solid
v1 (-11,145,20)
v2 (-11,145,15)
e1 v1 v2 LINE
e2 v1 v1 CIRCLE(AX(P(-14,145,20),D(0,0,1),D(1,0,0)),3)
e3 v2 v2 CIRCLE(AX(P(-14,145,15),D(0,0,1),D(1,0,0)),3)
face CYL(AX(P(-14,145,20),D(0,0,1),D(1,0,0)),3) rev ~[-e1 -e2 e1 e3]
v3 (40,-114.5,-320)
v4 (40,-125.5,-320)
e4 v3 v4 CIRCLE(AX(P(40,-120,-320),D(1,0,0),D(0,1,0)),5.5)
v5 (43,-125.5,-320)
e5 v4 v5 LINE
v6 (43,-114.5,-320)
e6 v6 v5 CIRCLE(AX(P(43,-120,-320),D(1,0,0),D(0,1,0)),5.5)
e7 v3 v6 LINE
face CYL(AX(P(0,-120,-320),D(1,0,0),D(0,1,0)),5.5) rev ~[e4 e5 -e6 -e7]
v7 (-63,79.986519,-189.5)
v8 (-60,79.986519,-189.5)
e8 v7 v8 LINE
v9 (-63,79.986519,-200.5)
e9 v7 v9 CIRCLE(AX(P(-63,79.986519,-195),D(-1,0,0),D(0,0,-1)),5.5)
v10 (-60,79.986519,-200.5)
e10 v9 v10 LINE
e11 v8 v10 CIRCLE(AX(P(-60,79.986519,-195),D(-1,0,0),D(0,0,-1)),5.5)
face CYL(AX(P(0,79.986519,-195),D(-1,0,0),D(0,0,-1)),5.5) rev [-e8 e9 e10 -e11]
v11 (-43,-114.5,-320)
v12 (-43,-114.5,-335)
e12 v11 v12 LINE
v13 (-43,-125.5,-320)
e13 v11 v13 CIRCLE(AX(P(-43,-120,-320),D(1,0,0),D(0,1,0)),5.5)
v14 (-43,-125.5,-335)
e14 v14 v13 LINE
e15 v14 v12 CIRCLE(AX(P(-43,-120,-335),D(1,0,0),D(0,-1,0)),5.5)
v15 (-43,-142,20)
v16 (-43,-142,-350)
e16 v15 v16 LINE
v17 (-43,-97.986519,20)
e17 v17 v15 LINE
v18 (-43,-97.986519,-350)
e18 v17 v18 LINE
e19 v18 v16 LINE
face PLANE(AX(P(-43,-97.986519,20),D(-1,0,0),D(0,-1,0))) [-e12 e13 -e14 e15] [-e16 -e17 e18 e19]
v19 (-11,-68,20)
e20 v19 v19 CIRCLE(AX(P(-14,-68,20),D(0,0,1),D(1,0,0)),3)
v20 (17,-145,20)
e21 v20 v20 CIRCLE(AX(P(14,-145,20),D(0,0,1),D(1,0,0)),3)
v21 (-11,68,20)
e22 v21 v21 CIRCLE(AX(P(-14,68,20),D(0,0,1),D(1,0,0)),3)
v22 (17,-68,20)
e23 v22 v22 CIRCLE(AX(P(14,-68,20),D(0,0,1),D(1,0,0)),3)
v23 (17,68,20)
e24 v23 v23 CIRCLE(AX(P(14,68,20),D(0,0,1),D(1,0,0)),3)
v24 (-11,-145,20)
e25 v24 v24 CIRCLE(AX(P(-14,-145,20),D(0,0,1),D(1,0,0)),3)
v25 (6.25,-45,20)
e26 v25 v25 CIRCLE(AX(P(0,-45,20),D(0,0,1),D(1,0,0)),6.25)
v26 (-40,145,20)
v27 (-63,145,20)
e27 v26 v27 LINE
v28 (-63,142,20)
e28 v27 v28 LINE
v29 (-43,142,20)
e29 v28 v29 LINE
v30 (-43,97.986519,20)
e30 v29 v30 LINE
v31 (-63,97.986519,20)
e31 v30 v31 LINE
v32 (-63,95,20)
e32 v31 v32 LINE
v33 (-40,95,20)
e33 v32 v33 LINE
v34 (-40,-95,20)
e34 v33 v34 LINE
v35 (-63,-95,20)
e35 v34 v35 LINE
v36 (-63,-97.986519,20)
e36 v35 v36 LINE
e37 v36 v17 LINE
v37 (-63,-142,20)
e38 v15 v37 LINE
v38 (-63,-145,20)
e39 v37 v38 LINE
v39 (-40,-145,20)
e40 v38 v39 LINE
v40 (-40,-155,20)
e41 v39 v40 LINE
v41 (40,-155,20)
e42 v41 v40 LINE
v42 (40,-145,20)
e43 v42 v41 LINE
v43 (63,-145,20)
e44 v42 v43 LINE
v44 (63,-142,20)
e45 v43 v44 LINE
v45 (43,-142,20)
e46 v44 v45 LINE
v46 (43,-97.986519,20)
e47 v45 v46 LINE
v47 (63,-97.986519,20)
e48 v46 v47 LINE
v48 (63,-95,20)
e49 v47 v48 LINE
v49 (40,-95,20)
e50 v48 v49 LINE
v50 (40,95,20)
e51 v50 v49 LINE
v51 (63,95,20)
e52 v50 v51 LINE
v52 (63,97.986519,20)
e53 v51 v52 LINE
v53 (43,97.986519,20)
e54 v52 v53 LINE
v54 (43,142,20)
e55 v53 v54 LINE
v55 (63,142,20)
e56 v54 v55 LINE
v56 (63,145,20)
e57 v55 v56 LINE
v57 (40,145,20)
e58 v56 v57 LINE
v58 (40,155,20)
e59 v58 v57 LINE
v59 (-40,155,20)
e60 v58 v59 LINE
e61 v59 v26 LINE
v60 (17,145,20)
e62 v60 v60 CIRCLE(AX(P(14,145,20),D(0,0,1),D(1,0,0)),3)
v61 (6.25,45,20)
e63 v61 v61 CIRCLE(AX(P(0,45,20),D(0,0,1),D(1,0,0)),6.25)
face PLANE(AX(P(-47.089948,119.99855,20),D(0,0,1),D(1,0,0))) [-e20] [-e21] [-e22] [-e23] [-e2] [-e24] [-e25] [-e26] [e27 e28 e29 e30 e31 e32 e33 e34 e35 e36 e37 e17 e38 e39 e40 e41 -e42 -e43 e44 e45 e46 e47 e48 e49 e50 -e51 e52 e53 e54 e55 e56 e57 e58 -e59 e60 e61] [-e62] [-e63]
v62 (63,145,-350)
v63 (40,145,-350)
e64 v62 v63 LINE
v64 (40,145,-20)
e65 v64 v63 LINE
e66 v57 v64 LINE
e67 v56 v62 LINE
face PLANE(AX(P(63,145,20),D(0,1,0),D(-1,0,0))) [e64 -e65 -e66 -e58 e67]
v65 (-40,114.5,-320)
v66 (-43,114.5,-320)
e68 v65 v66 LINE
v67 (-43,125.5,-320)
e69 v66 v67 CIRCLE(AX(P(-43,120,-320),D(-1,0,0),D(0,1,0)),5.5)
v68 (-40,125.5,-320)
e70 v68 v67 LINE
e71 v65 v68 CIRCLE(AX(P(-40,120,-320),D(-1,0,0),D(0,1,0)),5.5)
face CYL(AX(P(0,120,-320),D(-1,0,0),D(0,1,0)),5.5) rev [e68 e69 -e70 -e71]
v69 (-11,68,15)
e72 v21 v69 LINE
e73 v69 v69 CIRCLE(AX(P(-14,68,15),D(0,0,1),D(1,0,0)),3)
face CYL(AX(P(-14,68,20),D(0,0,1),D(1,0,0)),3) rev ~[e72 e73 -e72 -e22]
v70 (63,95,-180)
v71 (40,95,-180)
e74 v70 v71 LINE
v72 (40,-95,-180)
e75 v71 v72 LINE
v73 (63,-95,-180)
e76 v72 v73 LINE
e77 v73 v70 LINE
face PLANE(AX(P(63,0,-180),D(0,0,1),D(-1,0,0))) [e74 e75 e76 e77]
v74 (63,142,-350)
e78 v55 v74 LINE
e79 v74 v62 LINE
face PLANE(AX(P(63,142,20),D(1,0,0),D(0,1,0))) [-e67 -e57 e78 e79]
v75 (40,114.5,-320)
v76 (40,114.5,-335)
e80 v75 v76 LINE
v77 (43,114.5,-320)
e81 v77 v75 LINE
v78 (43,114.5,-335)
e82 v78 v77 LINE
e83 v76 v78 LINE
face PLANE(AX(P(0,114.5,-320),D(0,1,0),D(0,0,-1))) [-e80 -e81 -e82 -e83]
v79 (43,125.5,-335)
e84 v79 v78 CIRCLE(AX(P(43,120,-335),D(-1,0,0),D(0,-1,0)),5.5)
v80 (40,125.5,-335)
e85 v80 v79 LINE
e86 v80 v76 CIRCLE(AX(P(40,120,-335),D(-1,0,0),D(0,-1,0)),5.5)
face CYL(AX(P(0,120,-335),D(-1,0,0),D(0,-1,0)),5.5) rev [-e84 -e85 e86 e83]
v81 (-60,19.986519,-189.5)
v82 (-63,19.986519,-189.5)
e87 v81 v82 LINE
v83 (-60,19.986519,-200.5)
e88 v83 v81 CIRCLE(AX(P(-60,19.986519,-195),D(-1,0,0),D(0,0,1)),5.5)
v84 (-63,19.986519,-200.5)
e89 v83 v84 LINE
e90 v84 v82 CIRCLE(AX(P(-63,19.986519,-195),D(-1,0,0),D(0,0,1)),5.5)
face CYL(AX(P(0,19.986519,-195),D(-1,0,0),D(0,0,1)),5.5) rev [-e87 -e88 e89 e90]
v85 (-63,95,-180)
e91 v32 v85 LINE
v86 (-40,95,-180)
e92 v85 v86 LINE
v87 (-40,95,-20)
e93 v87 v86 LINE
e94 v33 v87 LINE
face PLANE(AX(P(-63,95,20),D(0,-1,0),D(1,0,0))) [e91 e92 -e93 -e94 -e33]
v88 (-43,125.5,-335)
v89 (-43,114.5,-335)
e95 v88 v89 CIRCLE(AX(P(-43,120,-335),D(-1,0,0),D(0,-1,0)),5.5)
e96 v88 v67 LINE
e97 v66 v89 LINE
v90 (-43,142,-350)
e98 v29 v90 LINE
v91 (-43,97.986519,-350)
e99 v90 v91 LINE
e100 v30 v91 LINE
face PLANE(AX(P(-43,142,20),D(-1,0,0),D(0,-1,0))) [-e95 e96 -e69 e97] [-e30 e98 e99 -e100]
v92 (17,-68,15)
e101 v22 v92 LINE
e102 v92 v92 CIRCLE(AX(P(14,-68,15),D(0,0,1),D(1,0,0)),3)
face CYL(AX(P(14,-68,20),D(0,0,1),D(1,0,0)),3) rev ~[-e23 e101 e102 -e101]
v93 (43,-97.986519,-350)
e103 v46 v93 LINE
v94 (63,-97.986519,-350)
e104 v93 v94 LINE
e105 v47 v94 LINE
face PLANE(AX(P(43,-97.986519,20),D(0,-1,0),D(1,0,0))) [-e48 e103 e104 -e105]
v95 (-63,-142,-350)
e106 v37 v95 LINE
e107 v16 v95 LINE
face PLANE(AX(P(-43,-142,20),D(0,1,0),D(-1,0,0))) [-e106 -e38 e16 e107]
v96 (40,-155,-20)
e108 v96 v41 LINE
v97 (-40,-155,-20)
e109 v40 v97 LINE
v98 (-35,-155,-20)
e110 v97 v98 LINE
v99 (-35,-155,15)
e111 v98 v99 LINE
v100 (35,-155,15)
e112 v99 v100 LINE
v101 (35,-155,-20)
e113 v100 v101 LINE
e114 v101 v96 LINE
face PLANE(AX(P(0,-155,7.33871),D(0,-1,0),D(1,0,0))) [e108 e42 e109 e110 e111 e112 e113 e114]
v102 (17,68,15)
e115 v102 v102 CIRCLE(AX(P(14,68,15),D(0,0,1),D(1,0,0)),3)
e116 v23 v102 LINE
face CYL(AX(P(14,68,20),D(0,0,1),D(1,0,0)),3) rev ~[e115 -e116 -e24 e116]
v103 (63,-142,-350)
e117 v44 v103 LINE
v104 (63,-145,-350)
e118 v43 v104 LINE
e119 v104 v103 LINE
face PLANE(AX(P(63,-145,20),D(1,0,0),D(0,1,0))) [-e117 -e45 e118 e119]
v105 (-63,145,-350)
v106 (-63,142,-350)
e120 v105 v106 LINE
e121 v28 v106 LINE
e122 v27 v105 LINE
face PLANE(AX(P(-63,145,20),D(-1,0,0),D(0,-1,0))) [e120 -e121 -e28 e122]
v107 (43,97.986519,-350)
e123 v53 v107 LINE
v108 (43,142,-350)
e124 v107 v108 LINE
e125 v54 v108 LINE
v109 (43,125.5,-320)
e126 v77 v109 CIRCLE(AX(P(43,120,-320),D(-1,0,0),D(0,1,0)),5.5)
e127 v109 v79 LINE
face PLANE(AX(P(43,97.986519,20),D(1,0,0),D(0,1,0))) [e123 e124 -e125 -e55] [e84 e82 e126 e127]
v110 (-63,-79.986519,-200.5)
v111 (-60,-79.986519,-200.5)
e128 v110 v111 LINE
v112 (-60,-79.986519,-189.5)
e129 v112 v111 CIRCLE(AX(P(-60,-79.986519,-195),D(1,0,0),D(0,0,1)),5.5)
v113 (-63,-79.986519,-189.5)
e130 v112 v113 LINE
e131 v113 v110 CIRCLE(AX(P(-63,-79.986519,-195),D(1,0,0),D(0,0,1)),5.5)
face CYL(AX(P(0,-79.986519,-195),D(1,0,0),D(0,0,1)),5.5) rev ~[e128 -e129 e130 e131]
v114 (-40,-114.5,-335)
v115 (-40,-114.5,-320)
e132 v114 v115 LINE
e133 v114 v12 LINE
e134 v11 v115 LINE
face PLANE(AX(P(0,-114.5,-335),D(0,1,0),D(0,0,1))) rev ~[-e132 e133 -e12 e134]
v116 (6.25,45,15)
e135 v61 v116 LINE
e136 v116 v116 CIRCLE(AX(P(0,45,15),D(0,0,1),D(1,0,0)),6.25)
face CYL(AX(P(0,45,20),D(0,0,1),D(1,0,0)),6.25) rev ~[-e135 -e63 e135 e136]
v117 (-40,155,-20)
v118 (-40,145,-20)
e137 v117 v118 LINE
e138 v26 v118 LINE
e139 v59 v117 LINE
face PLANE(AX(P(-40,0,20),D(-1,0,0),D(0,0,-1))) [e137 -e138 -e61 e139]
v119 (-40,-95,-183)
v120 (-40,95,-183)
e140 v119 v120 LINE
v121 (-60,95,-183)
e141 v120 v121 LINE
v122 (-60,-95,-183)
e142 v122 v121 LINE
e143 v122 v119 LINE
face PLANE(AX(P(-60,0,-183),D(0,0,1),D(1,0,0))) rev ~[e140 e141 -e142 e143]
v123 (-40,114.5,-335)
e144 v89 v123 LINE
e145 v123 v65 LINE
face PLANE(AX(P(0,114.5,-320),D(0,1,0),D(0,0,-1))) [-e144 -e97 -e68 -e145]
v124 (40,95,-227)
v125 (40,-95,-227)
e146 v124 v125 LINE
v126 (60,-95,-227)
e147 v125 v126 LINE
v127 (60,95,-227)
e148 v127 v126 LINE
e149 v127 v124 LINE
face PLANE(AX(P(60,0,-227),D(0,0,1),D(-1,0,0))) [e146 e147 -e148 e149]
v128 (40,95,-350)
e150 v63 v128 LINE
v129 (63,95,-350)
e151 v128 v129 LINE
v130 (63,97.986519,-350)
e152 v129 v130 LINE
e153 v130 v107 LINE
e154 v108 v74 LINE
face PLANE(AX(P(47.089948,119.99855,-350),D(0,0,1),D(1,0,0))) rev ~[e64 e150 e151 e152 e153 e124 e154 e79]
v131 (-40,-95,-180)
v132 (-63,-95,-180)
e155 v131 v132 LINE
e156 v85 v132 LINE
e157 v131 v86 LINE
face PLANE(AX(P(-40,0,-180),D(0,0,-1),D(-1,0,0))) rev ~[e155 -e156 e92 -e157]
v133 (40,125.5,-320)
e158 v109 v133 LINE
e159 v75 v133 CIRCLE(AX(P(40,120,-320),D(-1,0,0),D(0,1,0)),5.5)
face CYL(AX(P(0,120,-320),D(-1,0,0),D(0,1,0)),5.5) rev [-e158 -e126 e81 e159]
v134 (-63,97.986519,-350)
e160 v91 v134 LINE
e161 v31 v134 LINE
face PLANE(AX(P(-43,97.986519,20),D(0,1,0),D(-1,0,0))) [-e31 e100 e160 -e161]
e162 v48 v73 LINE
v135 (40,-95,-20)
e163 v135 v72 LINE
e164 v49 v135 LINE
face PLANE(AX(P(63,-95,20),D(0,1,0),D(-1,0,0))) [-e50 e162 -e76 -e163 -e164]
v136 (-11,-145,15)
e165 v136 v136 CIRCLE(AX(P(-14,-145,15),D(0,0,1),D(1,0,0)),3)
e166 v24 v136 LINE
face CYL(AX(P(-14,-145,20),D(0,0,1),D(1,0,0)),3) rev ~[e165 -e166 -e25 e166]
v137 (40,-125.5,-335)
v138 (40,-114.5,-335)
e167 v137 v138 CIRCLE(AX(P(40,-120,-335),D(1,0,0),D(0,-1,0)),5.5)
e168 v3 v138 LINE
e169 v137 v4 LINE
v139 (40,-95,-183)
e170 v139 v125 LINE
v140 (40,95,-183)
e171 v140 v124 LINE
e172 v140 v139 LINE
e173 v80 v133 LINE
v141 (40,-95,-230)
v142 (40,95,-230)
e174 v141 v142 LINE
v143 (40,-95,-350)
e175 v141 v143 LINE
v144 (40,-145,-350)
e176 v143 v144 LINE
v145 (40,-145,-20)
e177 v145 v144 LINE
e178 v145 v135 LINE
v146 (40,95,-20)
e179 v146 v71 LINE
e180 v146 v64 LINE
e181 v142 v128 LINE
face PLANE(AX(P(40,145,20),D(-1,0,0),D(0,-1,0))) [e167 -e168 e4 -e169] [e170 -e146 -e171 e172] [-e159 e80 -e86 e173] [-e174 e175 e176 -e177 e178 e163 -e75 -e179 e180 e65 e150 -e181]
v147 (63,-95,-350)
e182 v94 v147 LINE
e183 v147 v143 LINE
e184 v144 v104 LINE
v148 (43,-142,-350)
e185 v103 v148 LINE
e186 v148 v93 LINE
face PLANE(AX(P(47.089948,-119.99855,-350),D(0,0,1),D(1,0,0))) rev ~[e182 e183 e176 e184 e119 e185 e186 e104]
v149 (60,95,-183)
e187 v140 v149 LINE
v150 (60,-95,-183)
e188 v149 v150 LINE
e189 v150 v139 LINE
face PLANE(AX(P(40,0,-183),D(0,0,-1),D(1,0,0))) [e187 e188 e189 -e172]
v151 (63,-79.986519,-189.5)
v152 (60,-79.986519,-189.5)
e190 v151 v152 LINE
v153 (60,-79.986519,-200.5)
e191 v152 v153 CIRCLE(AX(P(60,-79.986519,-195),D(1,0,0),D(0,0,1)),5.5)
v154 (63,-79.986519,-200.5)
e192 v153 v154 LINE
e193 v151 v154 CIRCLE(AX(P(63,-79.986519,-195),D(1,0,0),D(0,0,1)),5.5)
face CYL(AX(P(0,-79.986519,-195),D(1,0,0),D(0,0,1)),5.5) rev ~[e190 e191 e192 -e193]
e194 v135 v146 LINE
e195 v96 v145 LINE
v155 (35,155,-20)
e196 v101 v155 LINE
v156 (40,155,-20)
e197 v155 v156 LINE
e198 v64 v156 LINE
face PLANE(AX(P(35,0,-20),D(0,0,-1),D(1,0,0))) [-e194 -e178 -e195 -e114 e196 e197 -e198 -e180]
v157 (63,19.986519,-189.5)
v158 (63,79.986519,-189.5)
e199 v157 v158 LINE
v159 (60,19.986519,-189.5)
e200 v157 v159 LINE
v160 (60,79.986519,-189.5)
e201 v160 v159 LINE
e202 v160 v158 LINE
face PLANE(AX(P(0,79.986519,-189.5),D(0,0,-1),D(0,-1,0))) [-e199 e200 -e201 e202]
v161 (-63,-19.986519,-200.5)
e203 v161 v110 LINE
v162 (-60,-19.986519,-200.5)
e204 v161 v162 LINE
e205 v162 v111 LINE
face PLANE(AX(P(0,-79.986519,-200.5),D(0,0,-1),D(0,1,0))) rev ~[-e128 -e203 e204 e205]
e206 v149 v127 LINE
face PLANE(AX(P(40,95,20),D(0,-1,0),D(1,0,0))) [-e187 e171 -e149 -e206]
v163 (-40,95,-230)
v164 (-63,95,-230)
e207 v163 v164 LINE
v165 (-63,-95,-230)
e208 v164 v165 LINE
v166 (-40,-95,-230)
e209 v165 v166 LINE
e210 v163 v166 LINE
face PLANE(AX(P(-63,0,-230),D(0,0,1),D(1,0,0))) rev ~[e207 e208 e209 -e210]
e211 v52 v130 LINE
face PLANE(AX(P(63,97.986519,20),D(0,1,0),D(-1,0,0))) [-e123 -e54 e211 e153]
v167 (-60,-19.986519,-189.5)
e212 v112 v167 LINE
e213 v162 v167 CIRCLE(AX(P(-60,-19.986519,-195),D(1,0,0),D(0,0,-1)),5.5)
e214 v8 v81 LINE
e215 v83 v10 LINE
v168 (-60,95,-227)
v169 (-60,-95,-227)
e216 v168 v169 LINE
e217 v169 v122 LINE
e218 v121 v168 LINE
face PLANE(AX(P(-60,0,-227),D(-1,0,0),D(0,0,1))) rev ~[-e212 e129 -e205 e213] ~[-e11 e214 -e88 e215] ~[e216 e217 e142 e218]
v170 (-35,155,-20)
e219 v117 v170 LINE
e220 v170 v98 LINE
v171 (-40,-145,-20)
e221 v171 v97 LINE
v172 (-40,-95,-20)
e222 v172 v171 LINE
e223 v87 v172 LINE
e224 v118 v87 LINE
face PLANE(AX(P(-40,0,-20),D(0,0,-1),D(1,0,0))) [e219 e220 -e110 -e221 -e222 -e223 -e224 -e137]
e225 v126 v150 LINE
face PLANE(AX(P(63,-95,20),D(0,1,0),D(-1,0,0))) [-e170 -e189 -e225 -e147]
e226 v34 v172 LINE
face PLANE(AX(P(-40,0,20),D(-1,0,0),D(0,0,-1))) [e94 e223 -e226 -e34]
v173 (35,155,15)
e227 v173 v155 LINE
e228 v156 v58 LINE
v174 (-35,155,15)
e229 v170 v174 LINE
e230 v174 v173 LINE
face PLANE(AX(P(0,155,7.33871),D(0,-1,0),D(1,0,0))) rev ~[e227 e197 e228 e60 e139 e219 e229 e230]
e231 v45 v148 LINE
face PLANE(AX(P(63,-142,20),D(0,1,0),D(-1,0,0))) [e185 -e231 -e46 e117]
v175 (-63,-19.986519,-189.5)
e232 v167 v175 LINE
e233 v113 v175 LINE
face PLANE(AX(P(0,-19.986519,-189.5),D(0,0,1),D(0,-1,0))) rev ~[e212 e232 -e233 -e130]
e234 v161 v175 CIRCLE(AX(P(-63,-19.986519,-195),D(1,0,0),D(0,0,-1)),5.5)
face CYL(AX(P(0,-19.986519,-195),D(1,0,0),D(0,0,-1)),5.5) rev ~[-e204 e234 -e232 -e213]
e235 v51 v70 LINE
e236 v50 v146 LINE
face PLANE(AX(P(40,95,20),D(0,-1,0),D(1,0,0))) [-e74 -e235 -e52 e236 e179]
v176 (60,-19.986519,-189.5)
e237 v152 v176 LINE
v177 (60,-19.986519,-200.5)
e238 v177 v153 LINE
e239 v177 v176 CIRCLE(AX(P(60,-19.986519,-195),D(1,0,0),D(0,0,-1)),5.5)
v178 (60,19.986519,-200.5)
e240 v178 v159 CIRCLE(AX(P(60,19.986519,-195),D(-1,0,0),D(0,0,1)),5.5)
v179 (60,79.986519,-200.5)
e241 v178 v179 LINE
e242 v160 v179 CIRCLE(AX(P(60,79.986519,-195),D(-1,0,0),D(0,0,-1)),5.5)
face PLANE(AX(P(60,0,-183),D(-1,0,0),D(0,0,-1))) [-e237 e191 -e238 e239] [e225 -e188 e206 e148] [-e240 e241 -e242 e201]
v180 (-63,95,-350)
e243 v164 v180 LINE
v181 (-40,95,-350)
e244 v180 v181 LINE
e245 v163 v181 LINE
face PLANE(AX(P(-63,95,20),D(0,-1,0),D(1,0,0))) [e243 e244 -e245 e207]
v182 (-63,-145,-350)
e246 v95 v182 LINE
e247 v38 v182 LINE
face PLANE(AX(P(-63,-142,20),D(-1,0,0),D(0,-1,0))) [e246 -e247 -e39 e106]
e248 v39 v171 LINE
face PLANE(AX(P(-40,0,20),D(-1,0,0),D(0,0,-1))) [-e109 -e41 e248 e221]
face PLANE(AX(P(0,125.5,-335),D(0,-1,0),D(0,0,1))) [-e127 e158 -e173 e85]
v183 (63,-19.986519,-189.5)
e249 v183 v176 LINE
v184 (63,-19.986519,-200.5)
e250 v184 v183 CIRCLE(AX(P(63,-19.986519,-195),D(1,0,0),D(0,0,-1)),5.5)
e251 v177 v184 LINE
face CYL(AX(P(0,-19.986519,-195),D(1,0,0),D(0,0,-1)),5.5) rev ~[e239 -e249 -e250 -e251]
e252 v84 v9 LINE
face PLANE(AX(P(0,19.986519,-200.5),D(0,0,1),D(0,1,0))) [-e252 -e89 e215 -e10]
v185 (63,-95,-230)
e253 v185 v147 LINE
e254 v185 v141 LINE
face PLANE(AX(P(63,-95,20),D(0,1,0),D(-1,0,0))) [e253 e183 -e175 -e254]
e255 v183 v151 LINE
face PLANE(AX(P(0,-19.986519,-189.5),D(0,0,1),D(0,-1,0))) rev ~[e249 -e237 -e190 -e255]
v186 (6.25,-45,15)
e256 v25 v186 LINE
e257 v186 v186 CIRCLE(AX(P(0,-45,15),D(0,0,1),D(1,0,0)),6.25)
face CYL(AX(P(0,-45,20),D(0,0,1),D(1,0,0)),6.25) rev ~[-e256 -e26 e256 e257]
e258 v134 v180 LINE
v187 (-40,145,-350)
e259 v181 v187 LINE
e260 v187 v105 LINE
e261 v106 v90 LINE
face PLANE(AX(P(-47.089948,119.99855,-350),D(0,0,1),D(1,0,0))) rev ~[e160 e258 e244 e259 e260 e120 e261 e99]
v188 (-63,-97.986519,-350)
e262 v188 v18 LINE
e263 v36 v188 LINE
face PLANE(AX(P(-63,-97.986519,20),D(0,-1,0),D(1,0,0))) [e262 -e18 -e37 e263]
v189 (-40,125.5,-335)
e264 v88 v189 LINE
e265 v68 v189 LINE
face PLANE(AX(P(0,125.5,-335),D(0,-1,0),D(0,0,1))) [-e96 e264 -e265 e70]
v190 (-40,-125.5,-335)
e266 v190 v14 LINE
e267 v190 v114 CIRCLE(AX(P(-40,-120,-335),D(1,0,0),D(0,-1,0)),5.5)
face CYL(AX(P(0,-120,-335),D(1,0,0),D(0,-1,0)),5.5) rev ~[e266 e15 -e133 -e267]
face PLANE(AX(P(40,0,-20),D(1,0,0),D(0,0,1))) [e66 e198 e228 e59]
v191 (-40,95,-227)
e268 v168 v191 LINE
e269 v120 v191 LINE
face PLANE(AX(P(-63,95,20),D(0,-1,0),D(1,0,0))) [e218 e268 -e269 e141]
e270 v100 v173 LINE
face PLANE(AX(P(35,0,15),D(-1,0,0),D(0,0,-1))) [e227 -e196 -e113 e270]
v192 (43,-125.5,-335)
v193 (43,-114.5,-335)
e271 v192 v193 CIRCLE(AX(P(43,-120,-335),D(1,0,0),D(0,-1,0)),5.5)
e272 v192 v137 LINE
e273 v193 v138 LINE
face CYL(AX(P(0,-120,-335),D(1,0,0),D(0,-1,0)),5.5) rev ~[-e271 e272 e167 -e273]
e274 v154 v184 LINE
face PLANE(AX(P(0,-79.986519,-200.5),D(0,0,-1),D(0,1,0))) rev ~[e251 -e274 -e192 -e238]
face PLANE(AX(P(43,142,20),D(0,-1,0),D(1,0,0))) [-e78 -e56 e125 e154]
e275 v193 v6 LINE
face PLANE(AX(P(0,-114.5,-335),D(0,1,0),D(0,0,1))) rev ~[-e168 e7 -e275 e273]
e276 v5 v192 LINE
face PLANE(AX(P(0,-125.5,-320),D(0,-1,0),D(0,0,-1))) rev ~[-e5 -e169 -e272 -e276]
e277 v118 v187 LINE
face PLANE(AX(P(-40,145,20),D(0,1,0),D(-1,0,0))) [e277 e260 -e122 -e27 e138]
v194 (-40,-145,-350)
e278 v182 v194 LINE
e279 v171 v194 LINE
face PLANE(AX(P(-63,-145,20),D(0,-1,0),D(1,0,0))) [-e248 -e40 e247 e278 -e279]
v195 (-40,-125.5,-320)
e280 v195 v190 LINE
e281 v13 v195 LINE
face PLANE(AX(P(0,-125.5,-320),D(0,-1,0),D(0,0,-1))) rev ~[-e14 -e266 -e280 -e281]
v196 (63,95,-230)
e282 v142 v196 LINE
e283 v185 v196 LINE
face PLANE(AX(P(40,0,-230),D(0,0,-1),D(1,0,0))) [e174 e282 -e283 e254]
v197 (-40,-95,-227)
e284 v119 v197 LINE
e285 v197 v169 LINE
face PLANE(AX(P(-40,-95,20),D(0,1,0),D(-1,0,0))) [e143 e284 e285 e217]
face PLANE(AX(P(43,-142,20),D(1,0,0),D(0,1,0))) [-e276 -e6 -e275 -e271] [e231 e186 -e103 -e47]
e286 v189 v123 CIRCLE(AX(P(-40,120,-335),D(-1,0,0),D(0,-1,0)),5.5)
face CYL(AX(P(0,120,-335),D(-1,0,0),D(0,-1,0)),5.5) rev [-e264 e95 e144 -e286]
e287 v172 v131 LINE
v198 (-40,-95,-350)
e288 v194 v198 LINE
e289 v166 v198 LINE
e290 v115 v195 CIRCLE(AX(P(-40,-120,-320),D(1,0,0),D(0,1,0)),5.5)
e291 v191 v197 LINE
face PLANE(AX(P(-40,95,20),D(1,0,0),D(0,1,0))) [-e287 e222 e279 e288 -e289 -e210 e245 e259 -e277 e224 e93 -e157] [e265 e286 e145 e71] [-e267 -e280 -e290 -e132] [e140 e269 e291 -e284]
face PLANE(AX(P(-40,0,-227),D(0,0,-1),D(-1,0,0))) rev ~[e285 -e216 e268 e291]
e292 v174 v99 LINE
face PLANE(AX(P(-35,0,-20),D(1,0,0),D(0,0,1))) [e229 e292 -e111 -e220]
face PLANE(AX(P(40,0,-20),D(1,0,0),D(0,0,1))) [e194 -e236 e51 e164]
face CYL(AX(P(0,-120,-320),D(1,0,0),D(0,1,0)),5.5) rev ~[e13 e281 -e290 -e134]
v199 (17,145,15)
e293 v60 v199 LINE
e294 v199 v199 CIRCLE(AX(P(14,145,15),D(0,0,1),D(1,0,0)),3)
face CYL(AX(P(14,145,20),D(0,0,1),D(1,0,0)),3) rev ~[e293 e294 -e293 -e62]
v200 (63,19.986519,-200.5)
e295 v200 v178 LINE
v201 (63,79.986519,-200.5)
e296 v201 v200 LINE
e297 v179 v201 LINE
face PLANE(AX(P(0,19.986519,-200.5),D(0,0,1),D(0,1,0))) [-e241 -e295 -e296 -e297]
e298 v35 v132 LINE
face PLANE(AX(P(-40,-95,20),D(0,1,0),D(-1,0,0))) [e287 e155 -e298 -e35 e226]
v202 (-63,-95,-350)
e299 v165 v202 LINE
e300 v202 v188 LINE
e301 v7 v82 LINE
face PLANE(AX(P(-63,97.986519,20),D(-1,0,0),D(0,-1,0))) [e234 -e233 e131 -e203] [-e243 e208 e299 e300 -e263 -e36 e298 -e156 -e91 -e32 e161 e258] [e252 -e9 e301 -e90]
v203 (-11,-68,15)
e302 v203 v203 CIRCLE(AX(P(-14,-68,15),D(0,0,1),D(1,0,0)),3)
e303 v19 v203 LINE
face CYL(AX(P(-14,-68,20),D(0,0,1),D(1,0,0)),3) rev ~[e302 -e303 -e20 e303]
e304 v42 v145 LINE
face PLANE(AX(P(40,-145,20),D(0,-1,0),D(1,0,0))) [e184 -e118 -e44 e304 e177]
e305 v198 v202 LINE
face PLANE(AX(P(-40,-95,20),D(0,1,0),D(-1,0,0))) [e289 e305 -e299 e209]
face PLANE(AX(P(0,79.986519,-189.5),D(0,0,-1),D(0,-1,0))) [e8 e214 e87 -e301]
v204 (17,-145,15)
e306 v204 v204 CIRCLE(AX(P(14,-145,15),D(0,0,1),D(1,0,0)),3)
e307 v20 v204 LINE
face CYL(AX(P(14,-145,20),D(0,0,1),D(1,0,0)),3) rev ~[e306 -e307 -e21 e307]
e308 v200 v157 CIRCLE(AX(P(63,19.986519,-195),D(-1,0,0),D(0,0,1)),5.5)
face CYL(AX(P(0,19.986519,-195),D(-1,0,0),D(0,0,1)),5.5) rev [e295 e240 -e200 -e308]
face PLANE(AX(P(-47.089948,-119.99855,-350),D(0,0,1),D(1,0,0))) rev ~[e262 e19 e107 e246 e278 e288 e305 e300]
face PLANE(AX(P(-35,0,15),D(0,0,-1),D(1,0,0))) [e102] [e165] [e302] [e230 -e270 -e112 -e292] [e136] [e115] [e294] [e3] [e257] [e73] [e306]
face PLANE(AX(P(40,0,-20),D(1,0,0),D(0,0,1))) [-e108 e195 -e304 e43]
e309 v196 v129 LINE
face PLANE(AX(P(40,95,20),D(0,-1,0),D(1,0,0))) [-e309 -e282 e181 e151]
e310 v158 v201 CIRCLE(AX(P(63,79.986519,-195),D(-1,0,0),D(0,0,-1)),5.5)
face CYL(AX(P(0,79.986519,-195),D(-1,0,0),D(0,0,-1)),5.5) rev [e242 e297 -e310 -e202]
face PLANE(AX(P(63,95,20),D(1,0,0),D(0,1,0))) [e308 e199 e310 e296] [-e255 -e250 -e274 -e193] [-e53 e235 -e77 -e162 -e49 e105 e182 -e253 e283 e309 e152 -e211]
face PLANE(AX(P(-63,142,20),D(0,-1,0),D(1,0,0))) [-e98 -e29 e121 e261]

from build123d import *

# Parameters (mm, degrees)
F1_DEPTH  = 155
F3_DEPTH  = 370
F5_DEPTH  = 50
F6_R      = 6.25
F7_DEPTH  = 25
F8_R      = 3
F9_DEPTH  = 25
F11_DEPTH = 97.5
F13_DEPTH = 75


# Not quite as in the source:
# - a feature names something its author has since deleted; it is built from what else it names


with BuildPart() as f1:
    # F0 (on Front) → F1 (new body, symmetric)
    with BuildSketch(Plane.XZ):
        Polygon((40, -20), (40, 20), (-40, 20), (-40, -20), (-35, -20), (-35, 15), (35, 15), (35, -20), align=None)
    extrude(amount=F1_DEPTH, both=True)

    # F2 (on face) → F3 (join)
    with BuildSketch(Plane.XY.offset(20)):
        Polygon((-40, 145), (-63, 145), (-63, 142), (-43, 142), (-43, 97.9865193367), (-63, 97.9865193367), (-63, 95), (-43, 95), (-40, 95), align=None)
        Polygon((-40, -145), (-40, -95), (-43, -95), (-63, -95), (-63, -97.9865193367), (-43, -97.9865193367), (-43, -142), (-63, -142), (-63, -145), align=None)
        Polygon((43, -95), (40, -95), (40, -145), (63, -145), (63, -142), (43, -142), (43, -97.9865193367), (63, -97.9865193367), (63, -95), align=None)
        Polygon((63, 145), (40, 145), (40, 95), (43, 95), (63, 95), (63, 97.9865193367), (43, 97.9865193367), (43, 142), (63, 142), align=None)
    extrude(amount=-F3_DEPTH)

    # F4 (on Right) → F5 (cut, symmetric)
    with BuildSketch(Plane.YZ):
        with BuildLine():
            Line((114.5, -320), (114.5, -335))
            ThreePointArc((114.5, -335), (120, -340.5), (125.5, -335))
            Line((125.5, -335), (125.5, -320))
            ThreePointArc((125.5, -320), (120, -314.5), (114.5, -320))
        make_face()
        with BuildLine():
            Line((-114.5, -335), (-114.5, -320))
            ThreePointArc((-114.5, -320), (-120, -314.5), (-125.5, -320))
            Line((-125.5, -320), (-125.5, -335))
            ThreePointArc((-125.5, -335), (-120, -340.5), (-114.5, -335))
        make_face()
    extrude(amount=F5_DEPTH, both=True, mode=Mode.SUBTRACT)

    # F6 (on face) → F7 (cut)
    with BuildSketch(Plane.XY.offset(20)):
        with Locations((0, 45)):
            Circle(F6_R)
        with Locations((0, -45)):
            Circle(F6_R)
    extrude(amount=-F7_DEPTH, mode=Mode.SUBTRACT)

    # F8 (on face) → F9 (cut)
    with BuildSketch(Plane.XY.offset(20)):
        with Locations((-14, 145)):
            Circle(F8_R)
        with Locations((14, 145)):
            Circle(F8_R)
        with Locations((-14, 68)):
            Circle(F8_R)
        with Locations((14, 68)):
            Circle(F8_R)
        with Locations((-14, -68)):
            Circle(F8_R)
        with Locations((14, -68)):
            Circle(F8_R)
        with Locations((-14, -145)):
            Circle(F8_R)
        with Locations((14, -145)):
            Circle(F8_R)
    extrude(amount=-F9_DEPTH, mode=Mode.SUBTRACT)

    # F10 (on Front) → F11 (join, symmetric)
    with BuildSketch(Plane.XZ):
        Polygon((-40, -180), (-63, -180), (-63, -230), (-40, -230), (-40, -227), (-60, -227), (-60, -183), (-40, -183), align=None)
        Polygon((63, -180), (40, -180), (40, -183), (60, -183), (60, -227), (40, -227), (40, -230), (63, -230), align=None)
    extrude(amount=F11_DEPTH, both=True)

    # F12 (on Right) → F13 (cut, symmetric)
    with BuildSketch(Plane.YZ):
        with BuildLine():
            Line((19.9865193367, -200.5), (79.9865193367, -200.5))
            ThreePointArc((79.9865193367, -200.5), (85.4865193367, -195), (79.9865193367, -189.5))
            Line((79.9865193367, -189.5), (19.9865193367, -189.5))
            ThreePointArc((19.9865193367, -189.5), (14.4865193367, -195), (19.9865193367, -200.5))
        make_face()
        with BuildLine():
            ThreePointArc((-79.9865193367, -189.5), (-85.4865193367, -195), (-79.9865193367, -200.5))
            Line((-79.9865193367, -200.5), (-19.9865193367, -200.5))
            ThreePointArc((-19.9865193367, -200.5), (-14.4865193367, -195), (-19.9865193367, -189.5))
            Line((-19.9865193367, -189.5), (-79.9865193367, -189.5))
        make_face()
    extrude(amount=F13_DEPTH, both=True, mode=Mode.SUBTRACT)


solid = f1.part
